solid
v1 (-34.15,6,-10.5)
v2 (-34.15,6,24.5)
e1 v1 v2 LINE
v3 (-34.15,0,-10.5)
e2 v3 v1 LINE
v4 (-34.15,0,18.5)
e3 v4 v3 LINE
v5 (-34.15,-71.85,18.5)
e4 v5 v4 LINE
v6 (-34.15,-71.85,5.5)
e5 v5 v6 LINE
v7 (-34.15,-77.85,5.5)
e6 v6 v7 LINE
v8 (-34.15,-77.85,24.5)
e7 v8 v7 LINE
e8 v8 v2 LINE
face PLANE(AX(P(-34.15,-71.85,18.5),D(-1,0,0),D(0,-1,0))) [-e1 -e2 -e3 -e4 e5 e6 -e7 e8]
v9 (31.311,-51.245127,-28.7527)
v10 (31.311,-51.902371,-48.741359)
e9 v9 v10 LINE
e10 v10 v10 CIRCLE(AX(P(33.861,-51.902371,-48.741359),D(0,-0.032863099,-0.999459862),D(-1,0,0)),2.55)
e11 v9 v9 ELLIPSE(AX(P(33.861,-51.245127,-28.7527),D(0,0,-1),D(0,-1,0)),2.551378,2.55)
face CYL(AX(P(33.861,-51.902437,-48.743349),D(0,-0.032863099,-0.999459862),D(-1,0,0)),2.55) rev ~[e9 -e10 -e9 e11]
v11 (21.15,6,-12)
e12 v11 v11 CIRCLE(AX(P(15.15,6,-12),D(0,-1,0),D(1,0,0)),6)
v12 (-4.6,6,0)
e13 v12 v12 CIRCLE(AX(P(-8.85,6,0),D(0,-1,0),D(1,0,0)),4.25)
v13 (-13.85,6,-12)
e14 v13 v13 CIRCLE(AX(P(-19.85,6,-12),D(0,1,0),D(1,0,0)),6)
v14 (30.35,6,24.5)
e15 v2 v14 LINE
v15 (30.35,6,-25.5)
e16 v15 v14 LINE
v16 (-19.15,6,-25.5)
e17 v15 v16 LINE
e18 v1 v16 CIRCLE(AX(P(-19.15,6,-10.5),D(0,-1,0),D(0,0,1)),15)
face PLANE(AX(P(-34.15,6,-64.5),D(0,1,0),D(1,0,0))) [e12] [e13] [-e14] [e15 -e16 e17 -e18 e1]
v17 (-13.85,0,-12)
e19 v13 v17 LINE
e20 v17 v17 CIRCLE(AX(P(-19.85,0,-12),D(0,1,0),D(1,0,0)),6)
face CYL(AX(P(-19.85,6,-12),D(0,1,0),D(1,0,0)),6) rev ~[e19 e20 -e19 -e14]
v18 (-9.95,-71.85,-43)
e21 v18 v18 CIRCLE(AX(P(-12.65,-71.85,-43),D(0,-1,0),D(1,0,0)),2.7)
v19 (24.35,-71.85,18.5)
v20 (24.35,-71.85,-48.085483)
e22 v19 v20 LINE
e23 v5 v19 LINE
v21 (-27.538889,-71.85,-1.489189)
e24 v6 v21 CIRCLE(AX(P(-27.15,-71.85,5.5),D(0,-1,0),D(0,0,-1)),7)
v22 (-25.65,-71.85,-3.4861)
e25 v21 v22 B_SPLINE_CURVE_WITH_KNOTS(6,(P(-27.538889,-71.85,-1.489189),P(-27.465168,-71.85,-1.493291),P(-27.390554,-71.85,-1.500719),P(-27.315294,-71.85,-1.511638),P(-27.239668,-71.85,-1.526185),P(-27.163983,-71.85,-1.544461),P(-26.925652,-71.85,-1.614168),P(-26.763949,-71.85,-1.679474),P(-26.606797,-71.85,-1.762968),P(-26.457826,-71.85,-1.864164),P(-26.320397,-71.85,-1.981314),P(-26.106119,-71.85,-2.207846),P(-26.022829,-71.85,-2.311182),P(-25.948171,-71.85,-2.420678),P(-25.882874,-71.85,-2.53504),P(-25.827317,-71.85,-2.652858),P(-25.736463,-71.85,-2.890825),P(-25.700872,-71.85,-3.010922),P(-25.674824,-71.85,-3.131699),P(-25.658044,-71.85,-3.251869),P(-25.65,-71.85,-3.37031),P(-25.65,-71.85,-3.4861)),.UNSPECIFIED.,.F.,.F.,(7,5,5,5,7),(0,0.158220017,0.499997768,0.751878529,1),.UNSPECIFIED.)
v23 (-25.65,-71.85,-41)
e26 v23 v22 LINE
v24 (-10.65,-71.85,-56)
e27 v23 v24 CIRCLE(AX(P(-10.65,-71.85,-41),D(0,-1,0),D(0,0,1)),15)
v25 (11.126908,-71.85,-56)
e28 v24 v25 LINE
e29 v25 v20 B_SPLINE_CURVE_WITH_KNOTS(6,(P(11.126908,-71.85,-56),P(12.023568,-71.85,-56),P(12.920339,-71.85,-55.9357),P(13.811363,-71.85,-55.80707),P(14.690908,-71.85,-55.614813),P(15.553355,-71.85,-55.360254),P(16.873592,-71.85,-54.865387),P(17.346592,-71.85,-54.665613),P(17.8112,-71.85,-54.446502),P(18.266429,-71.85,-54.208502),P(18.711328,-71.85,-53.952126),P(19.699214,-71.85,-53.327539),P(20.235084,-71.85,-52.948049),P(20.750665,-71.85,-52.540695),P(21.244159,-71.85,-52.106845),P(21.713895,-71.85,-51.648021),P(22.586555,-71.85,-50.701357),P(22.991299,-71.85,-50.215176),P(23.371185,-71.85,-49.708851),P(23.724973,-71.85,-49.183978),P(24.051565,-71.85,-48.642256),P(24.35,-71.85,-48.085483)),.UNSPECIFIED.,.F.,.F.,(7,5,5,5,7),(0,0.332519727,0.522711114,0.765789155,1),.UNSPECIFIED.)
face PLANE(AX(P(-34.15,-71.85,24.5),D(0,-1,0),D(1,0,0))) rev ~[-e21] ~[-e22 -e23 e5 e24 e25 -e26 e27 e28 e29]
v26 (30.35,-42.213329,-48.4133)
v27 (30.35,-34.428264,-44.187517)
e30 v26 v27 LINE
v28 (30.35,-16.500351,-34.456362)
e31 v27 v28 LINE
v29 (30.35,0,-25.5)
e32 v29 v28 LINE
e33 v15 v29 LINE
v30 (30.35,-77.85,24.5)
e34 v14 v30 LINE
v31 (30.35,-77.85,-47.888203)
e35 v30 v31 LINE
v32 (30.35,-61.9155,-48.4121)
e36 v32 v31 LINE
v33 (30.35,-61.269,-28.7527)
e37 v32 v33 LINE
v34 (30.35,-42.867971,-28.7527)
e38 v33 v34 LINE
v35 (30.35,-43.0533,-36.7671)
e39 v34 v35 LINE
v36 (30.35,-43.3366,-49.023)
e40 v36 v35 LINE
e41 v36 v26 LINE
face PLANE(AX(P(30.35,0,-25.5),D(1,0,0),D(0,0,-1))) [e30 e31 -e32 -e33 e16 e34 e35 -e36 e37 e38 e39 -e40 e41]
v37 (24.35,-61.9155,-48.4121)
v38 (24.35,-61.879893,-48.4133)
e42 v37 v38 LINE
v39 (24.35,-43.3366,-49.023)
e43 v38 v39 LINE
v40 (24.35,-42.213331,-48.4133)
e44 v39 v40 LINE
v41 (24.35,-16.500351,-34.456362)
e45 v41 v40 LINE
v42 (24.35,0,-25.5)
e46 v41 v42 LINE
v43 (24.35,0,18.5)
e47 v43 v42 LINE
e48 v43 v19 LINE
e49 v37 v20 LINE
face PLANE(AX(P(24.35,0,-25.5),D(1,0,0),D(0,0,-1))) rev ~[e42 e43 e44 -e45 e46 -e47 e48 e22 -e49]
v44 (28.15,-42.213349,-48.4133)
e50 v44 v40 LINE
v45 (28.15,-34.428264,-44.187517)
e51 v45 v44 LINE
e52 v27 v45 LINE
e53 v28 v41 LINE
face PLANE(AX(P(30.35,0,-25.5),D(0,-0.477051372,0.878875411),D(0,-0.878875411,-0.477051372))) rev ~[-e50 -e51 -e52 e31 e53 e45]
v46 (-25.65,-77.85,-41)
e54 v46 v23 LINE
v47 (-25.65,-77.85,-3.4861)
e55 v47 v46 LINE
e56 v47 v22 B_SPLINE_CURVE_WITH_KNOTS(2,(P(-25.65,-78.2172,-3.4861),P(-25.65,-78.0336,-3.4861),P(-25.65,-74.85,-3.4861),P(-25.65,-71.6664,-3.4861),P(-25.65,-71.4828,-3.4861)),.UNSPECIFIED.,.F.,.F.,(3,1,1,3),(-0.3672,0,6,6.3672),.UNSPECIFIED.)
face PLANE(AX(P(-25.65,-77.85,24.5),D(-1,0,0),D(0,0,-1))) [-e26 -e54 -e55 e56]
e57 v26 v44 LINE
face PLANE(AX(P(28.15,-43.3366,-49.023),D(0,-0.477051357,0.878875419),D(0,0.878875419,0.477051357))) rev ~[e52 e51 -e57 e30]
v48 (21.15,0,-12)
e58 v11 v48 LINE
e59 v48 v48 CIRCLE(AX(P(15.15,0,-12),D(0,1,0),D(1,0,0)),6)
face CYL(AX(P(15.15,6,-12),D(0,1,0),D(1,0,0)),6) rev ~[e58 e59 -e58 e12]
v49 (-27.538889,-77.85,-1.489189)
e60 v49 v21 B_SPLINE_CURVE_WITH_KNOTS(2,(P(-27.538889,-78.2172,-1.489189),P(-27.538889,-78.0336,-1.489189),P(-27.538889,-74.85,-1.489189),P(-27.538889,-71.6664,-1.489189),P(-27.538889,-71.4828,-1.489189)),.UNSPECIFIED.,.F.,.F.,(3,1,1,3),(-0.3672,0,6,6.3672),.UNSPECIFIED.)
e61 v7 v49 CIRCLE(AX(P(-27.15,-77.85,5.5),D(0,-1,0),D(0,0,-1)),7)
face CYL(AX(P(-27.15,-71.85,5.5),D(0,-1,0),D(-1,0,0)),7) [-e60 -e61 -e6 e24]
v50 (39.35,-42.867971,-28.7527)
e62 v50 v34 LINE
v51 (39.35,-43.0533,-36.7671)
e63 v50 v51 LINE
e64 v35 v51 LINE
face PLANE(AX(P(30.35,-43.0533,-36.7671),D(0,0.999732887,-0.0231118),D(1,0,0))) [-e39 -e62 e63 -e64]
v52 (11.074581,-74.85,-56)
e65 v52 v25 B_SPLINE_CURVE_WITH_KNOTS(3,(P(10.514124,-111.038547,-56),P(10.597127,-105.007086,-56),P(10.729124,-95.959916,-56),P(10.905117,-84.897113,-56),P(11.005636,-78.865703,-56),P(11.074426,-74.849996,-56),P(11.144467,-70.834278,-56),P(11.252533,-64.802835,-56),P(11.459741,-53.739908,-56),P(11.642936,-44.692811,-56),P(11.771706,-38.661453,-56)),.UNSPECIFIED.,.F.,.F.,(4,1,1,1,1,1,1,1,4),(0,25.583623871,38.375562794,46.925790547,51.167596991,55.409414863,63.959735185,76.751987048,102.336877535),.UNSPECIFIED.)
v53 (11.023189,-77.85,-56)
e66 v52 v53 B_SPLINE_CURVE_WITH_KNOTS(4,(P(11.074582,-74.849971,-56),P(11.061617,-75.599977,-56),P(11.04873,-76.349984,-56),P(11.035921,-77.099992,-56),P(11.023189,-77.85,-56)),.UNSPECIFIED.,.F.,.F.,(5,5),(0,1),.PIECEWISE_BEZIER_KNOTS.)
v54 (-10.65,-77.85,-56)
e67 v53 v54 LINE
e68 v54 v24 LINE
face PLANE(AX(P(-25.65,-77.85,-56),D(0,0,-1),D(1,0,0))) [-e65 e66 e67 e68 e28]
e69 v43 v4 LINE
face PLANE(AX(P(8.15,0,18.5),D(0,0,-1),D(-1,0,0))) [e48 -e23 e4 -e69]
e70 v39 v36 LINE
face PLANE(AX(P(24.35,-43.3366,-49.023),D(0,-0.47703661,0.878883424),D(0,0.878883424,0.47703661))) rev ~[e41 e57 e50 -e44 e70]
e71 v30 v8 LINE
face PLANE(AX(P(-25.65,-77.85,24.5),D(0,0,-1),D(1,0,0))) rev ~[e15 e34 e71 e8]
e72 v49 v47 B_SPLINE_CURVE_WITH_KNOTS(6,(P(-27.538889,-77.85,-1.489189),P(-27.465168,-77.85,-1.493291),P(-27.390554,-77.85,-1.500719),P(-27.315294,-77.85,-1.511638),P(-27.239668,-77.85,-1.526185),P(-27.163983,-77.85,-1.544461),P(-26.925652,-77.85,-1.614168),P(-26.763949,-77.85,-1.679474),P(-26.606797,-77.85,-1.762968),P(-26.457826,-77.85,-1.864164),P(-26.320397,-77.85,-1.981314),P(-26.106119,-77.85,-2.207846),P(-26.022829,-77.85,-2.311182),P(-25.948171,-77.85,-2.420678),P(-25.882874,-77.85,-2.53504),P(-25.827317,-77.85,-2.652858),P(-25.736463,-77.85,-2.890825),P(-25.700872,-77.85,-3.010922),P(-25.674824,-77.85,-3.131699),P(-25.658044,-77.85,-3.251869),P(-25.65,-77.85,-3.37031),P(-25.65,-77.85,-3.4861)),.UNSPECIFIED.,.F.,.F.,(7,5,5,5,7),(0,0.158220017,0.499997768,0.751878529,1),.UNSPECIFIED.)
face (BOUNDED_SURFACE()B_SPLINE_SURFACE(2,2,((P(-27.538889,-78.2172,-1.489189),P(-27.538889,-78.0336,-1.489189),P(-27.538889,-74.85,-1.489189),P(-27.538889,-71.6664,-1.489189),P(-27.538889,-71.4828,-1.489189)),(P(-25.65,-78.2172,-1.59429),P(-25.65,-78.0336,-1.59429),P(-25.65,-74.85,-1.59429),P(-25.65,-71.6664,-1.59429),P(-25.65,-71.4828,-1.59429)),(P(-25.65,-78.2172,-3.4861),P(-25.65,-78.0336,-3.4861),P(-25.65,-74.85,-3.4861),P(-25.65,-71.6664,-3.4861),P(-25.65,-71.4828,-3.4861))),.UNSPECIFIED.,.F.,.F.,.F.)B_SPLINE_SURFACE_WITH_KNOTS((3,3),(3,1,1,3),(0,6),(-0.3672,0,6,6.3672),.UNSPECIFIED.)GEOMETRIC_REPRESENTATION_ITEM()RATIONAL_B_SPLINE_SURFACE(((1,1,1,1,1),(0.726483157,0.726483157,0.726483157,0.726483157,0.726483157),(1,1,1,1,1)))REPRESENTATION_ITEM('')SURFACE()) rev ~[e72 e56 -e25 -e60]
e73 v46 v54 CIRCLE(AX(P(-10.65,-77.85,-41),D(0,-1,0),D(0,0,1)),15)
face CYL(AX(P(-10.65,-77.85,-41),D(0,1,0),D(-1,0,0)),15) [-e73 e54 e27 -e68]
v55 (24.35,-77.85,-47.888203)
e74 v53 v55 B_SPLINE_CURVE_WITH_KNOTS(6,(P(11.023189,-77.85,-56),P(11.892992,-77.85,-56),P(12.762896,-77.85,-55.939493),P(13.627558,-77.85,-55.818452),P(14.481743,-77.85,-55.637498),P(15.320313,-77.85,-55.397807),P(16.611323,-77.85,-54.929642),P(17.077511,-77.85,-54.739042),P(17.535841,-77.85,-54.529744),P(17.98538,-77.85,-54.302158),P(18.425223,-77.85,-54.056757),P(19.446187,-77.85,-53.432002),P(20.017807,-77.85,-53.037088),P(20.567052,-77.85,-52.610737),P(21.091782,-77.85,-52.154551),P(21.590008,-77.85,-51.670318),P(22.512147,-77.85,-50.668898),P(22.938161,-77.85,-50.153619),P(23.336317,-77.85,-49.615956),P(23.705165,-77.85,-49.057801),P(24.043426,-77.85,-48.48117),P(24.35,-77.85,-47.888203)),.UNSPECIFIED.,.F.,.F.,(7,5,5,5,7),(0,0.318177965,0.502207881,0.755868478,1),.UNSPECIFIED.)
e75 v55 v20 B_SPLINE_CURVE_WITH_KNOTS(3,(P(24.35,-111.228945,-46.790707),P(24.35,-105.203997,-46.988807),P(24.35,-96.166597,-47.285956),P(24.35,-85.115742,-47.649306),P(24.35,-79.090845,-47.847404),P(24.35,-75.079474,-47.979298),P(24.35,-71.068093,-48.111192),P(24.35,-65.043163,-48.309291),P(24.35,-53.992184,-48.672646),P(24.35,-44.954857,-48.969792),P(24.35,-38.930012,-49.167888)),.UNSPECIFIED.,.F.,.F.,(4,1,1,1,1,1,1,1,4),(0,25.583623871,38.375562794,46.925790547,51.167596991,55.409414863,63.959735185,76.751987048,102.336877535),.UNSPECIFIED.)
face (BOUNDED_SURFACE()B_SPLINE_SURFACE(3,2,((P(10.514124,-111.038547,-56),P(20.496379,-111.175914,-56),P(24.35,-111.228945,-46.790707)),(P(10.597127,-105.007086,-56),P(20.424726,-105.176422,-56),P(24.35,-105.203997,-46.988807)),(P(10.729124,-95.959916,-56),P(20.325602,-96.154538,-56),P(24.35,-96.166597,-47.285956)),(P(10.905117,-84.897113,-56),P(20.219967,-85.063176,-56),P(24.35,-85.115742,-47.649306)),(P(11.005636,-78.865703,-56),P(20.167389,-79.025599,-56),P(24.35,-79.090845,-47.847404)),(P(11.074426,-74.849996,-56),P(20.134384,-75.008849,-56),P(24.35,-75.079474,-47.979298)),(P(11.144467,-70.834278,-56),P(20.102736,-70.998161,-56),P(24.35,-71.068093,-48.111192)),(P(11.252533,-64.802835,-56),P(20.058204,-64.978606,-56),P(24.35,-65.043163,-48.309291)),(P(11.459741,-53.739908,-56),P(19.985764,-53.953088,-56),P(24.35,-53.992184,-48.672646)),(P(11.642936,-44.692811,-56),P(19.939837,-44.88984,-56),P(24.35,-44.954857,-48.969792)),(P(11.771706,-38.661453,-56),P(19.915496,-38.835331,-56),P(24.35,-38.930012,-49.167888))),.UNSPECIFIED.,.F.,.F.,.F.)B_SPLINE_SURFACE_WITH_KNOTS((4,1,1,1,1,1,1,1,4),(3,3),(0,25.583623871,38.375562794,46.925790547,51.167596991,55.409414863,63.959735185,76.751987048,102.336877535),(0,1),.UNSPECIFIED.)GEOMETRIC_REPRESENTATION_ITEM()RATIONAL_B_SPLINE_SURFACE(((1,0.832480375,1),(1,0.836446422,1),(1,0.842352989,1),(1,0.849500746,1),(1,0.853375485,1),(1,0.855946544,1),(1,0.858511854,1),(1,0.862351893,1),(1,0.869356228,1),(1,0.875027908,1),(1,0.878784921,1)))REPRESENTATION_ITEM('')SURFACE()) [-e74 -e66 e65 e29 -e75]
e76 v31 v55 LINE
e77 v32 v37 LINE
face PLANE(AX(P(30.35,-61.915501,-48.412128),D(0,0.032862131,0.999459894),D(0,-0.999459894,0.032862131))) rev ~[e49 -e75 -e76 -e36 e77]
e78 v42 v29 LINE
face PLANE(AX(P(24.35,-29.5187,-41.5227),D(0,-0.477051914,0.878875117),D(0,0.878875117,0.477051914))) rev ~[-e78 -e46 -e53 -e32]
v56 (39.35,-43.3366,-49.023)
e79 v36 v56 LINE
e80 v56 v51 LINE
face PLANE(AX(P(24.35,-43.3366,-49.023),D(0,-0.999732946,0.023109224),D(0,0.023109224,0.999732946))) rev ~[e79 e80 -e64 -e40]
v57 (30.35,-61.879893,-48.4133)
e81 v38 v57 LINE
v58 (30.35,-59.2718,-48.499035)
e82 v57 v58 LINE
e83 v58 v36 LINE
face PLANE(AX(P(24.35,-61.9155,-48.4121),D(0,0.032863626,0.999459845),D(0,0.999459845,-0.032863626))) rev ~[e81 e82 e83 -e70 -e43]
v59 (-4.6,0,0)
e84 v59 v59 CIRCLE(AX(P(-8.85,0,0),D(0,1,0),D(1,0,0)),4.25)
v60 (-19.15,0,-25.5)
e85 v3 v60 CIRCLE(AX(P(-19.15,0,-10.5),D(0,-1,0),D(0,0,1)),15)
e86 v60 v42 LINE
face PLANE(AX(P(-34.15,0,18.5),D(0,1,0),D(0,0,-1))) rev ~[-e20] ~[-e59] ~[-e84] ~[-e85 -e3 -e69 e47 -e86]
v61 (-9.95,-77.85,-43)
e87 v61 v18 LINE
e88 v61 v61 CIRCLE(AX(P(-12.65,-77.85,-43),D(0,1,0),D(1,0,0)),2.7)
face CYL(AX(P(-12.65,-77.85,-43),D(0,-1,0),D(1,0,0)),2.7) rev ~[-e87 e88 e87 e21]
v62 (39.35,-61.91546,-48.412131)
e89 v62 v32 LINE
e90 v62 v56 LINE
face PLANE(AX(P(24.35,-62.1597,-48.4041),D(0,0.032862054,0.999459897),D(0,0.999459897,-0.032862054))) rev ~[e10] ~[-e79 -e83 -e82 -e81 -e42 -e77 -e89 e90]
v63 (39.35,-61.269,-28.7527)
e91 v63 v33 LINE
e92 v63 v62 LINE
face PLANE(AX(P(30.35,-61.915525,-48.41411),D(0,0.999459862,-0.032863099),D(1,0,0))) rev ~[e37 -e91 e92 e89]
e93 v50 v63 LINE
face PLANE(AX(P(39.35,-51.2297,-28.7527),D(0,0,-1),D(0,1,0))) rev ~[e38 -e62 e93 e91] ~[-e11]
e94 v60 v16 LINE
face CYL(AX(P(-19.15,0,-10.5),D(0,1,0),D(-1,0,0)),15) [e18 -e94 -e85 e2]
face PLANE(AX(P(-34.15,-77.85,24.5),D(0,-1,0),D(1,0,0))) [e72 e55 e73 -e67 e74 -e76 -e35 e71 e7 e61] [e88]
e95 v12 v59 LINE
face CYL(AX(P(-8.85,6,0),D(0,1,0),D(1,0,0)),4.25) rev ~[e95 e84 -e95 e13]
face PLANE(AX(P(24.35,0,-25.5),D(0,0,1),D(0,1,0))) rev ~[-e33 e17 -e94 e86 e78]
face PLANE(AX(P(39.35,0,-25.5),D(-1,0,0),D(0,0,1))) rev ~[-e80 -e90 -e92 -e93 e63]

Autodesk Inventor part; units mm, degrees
ref_plane "YZ Plane" through (0, 0, 0) normal (1, 0, 0) x (0, 1, 0)
ref_plane "XZ Plane" through (0, 0, 0) normal (0, 1, 0) x (-1, 0, 0)
ref_plane "XY Plane" through (0, 0, 0) normal (0, 0, 1) x (1, 0, 0)
sketch "Sketch1" plane through (0, 0, 0) normal (0, 1, 0) x (-1, 0, 0)
  line L0 (0, -25.5) -> (-34.15, -25.5)
  line L1 (-34.15, -25.5) -> (-34.15, 0)
  line L2 (-34.15, 0) -> (-34.15, 25.5)
  line L3 (-34.15, 25.5) -> (0, 25.5)
  line L4 (0, 25.5) -> (34.15, 25.5)
  line L5 (34.15, 25.5) -> (34.15, 0)
  line L6 (34.15, 0) -> (34.15, -25.5)
  line L7 (34.15, -25.5) -> (0, -25.5)
  point P0 (0, 0)
extrude "Extrusion1" add sketch "Sketch1" along normal blind 7
sketch "Sketch3" plane through (-34.15, 0, 25.5) normal (0, 0, 1) x (1, 0, 0)
  line L0 (0, 0) -> (0, -78.85)
  point P0 (34.15, 0)
  dimension "d7" = 78.85
sketch "Sketch4" plane through (-34.15, 0, -25.5) normal (-1, 0, 0) x (0, 0, 1)
  line L0 (51, 0) -> (51, -78.85)
  line L1 (51, -78.85) -> (-39, -78.85)
  line L2 (-39, -78.85) -> (-39, -71.85)
  line L3 (0, 0) -> (-39, -71.85)
  line L4 (0, 0) -> (51, 0)
  point P0 (25.5, 0)
  dimension "d10" = 90
  dimension "d11" = 7
extrude "Extrusion2" add sketch "Sketch4" against normal blind 7
sketch "Sketch7" plane through (-27.15, 0, -25.5) normal (1, 0, 0) x (0, 0, -1)
  line L0 (-51, -78.85) -> (39, -78.85) projected
  line L1 (-51, -78.85) -> (39, -78.85)
  line L2 (39, -78.85) -> (39, -71.85) projected
  line L3 (39, -78.85) -> (39, -71.85)
  line L4 (39, -71.85) -> (-51, -71.85)
  line L5 (-51, 0) -> (-51, -78.85) projected
  line L6 (-51, -78.85) -> (-51, -71.85)
  point P0 (-25.5, 0)
sketch "Sketch8" plane through (0, 0, 0) normal (0, -1, 0) x (1, 0, 0)
  circle A0 centre (8.15, 0) radius 5 projected
  line L0 (8.15, 18.5) -> (34.15, 18.5)
  line L1 (34.15, 25.5) -> (34.15, -25.5) projected
  line L2 (8.15, 25.5) -> (34.15, 25.5)
  line L3 (8.15, 25.5) -> (-27.15, 25.5)
  line L4 (-27.15, 25.5) -> (-27.15, -25.5) projected
  line L5 (8.15, 18.5) -> (-27.15, 18.5)
  line L6 (34.15, 25.5) -> (34.15, 18.5)
  line L7 (-27.15, 25.5) -> (-27.15, 18.5)
  point P0 (0, 0)
extrude "Extrusion6" add sketch "Sketch7" along normal blind 58.5
extrude "Extrusion7" add sketch "Sketch8" along normal blind 78.75 contours L5 L4 L3 L2 L1 L0
sketch "Sketch9" plane through (31.35, 0, -25.5) normal (1, 0, 0) x (0, 0, -1)
  line L0 (-51, -78.75) -> (-51, 7) projected
  line L1 (-44, 0) -> (-44, -71.85) projected
  line L2 (-51, -78.75) -> (-44, -78.75)
  line L3 (-44, -78.75) -> (-44, -71.85)
  line L4 (-44, -71.85) -> (-51, -71.85)
  line L5 (-51, -71.85) -> (-51, -78.75)
  point P0 (-25.5, 0)
extrude "Extrusion8" cut sketch "Sketch9" along normal blind 10
sketch "Sketch10" plane through (0, 7, 0) normal (0, 1, 0) x (1, 0, 0)
  point P0 (0, 0)
sketch "Boceto11" plane through (-34.15, -78.85, -64.5) normal (0, -1, 0) x (1, 0, 0)
  line L0 (0, 0) -> (65.5, 0) projected
  line L1 (65.5, 89.9985) -> (65.5, 0)
  line L2 (65.5, 0) -> (71.065, 0)
  line L3 (71.065, 0) -> (71.065, 89.9985)
  line L4 (71.065, 89.9985) -> (65.5, 89.9985)
  line L5 (65.5, 89.9985) -> (65.5, 95.8996)
  line L6 (65.5, 95.8996) -> (71.065, 89.9985)
  point P0 (34.15, 64.5)
extrude "Extrusión9" cut sketch "Boceto11" against normal blind 100
sketch "Boceto12" plane through (31.35, 0, -25.5) normal (1, 0, 0) x (0, 0, -1)
  line L0 (-44, 0) -> (-44, -71.85) projected
  line L1 (-44, 0) -> (-44, -71.85)
  line L2 (39, -71.85) -> (39, -78.85) projected
  line L3 (-44, -71.85) -> (39, -71.85)
  line L4 (-44, 0) -> (0, 0) projected
  line L5 (39, -71.85) -> (0, 0)
  line L6 (0, 0) -> (-44, 0)
  point P0 (-25.5, 0)
extrude "Extrusión10" add sketch "Boceto12" against normal blind 7
sketch "Boceto13" plane through (-34.15, 7, -25.5) normal (-1, 0, 0) x (0, 0, 1)
  line L0 (0, -7) -> (0, 0) projected
  line L1 (44, -7) -> (0, -7) projected
  line L2 (0, -7) -> (44, -7)
  line L3 (44, -78.85) -> (-39, -78.85) projected
  line L4 (44, -7) -> (44, -78.85)
  line L5 (44, -78.85) -> (-39, -78.85)
  line L6 (-39, -78.85) -> (0, -7)
  point P0 (25.5, -7)
extrude "Extrusión11" cut sketch "Boceto13" against normal blind 7
sketch "Boceto15" plane through (-34.15, 0, -25.5) normal (0, 0, -1) x (-1, 0, 0)
  point P0 (-34.15, 0)
sketch "Boceto19" plane through (-34.15, -78.85, -64.5) normal (0, -1, 0) x (1, 0, 0)
  line L0 (65.5, 90) -> (65.5, 0) projected
  line L1 (65.5, 0) -> (65.5, 40.9323)
  line L2 (81.7334, 40.9323) -> (65.5, 40.9323)
  line L3 (81.7334, 40.9323) -> (81.7334, 0)
  line L4 (81.7334, 0) -> (65.5, 0)
  point P0 (34.15, 64.5)
extrude "Extrusión17" cut sketch "Boceto19" against normal blind 100
sketch "Boceto20" plane through (24.35, 0, -25.5) normal (-1, 0, 0) x (0, 0, 1)
  line L0 (-29.1839, -53.7657) -> (-27.9516, -53.3206) projected
  line L1 (0, 0) -> (-39, -71.85) projected
  line L2 (-29.1839, -53.7657) -> (-27.8697, -51.3447)
  line L3 (-27.8697, -51.3447) -> (-27.9516, -53.3206) projected
  line L4 (-27.8697, -51.3447) -> (-27.9516, -53.3206)
  line L5 (-27.9516, -53.3206) -> (-29.1839, -53.7657)
  point P0 (25.5, 0)
extrude "Extrusión18" add sketch "Boceto20" against normal blind 7
sketch "Boceto21" plane through (24.35, 0, -25.5) normal (-1, 0, 0) x (0, 0, 1)
  point P0 (25.5, 0)
sketch "Boceto22" plane through (24.35, 0, -25.5) normal (-1, 0, 0) x (0, 0, 1)
  point P0 (25.5, 0)
sketch "Boceto24" plane through (31.35, 0, -25.5) normal (1, 0, 0) x (0, 0, -1)
  point P0 (-25.5, 0)
sketch "Boceto26" plane through (24.35, 0, -25.5) normal (-1, 0, 0) x (0, 0, 1)
  point P0 (25.5, 0)
sketch "Boceto27" plane through (31.35, 0, -25.5) normal (1, 0, 0) x (0, 0, -1)
  line L0 (-51, 7) -> (0, 7) projected
  line L1 (0, 7) -> (16.0227, 7)
  line L2 (16.0227, 7) -> (16.0227, -29.5187)
  line L3 (0, 0) -> (39, -71.85) projected
  line L4 (16.0227, -29.5187) -> (0, 0)
  line L5 (0, 0) -> (0, 7)
  point P0 (-25.5, 0)
extrude "Extrusión22" add sketch "Boceto27" against normal blind 7
sketch "Boceto28" plane through (24.35, 0, -25.5) normal (-1, 0, 0) x (0, 0, 1)
  line L0 (-16.0227, -29.5187) -> (-39, -71.85) projected
  line L1 (-16.0227, -29.5187) -> (0, 0)
  line L2 (0, 7) -> (-16.0227, 7) projected
  line L3 (0, 0) -> (0, 7)
  line L4 (0, 7) -> (-16.0227, 7)
  line L5 (-16.0227, 7) -> (-16.0227, -29.5187) projected
  line L6 (-16.0227, 7) -> (-16.0227, -29.5187)
  point P0 (25.5, 0)
extrude "Extrusión23" cut sketch "Boceto28" against normal blind 7
sketch "Boceto29" plane through (31.35, 0, -25.5) normal (1, 0, 0) x (0, 0, -1)
  point P0 (-25.5, 0)
sketch "Boceto31" plane through (-34.15, -78.85, -64.5) normal (0, 0, -1) x (-1, 0, 0)
  line L0 (0, 7) -> (0, 0) projected
  line L1 (0, 0) -> (0, 1)
  line L2 (0, 1) -> (-65.5, 1)
  line L3 (-65.5, 0) -> (-65.5, 85.85) projected
  line L4 (-65.5, 1) -> (-64.5, 1)
  line L5 (-64.5, 1) -> (-64.5, 85.85)
  line L6 (0, 85.85) -> (-65.5, 85.85) projected
  line L7 (-64.5, 85.85) -> (0, 85.85)
  line L8 (0, 85.85) -> (0, 84.85)
  line L9 (0, 0) -> (0, 85.85) projected
  line L10 (0, 84.85) -> (-64.5, 84.85)
  line L11 (-64.5, 85.85) -> (-65.5, 85.85)
  line L12 (0, 0) -> (-65.5, 0) projected
  line L13 (-65.5, 85.85) -> (-65.5, 0)
  line L14 (-65.5, 0) -> (0, 0)
  point P0 (-34.15, 78.85)
  dimension "d84" = 1
  dimension "d85" = 1
  dimension "d86" = 1
extrude "Extrusión26" cut sketch "Boceto31" against normal blind 1000 contours L0 L12 L3 L2 | L10 L5 L6 L8 | L2 L3 L6 L5
sketch "Boceto32" plane through (-34.15, -71.85, 18.5) normal (-1, 0, 0) x (0, 0, 1)
  line L0 (-83, -6) -> (7, -6) projected
  line L1 (7, -6) -> (6, -6)
  line L2 (6, -6) -> (6, 77.85)
  line L3 (7, 77.85) -> (-44, 77.85) projected
  line L4 (7, -6) -> (7, 77.85) projected
  line L5 (6, 77.85) -> (7, 77.85)
  line L6 (7, 77.85) -> (7, -6)
  point P0 (-18.5, 71.85)
  dimension "d89" = 1
extrude "Extrusión27" cut sketch "Boceto32" against normal blind 100
sketch "Boceto33" plane through (-34.15, 6, -25.5) normal (0, 1, 0) x (1, 0, 0)
  line L0 (0, 0) -> (0, -44) projected
  line L1 (0, 0) -> (0, -25.5)
  line L2 (0, -25.5) -> (25.3, -25.5)
  circle A0 centre (25.3, -25.5) radius 4.25
  point P0 (34.15, -25.5)
  dimension "d92" = 25.5
  dimension "d93" = 25.3
  dimension "d94" = 8.5
extrude "Extrusión28" cut sketch "Boceto33" against normal blind 10
sketch "Boceto34" plane through (30.35, -77.85, -64.5) normal (1, 0, 0) x (0, 0, -1)
  point P0 (-64.5, 77.85)
sketch "Boceto35" plane through (30.35, -77.85, -64.5) normal (1, 0, 0) x (0, 0, -1)
  circle A0 centre (-24.4828, 41.285) radius 2.6
  point P0 (-64.5, 77.85)
  dimension "d101" = 5.2
extrude "Extrusión29" cut sketch "Boceto35" against normal blind 10
sketch "Boceto36" plane through (30.35, -77.85, -64.5) normal (1, 0, 0) x (0, 0, -1)
  point P0 (-64.5, 77.85)
sketch "Boceto37" plane through (30.35, -77.85, -64.5) normal (1, 0, 0) x (0, 0, -1)
  line L0 (-39, 77.85) -> (0, 6) projected
  line L1 (-12.3437, 28.741) -> (-12.3437, 48.1268)
  line L2 (-12.3437, 48.1268) -> (-28.4038, 58.3285)
  line L3 (-12.3437, 28.741) -> (-28.4038, 58.3285)
  point P0 (-64.5, 77.85)
extrude "Extrusión30" add sketch "Boceto37" against normal blind 6
fillet "Empalme3" radius 10 3 edges at (27.35, -29.7232, -52.1563) (27.35, -49.109, -52.1563) (27.35, -19.5215, -36.0962)
sketch "Boceto38" plane through (30.35, -77.85, -64.5) normal (1, 0, 0) x (0, 0, -1)
  point P0 (-64.5, 77.85)
sketch "Boceto39" plane through (30.35, -77.85, -64.5) normal (1, 0, 0) x (0, 0, -1)
  line L0 (-6.8274, 18.5782) -> (-18.8698, 18.5782)
  line L1 (-18.8698, 18.5782) -> (-18.2969, 35.7502)
  line L2 (-18.2969, 35.7502) -> (-20.685, 39.2299)
  line L3 (-20.685, 39.2299) -> (-19.4909, 52.6668)
  line L4 (-26.2143, 56.9377) -> (-16.9818, 51.073) projected
  line L5 (-6.8274, 18.5782) -> (-5.5662, 48.0514)
  line L6 (-5.5662, 48.0514) -> (-19.4909, 52.6668)
  point P0 (-64.5, 77.85)
extrude "Extrusión31" cut sketch "Boceto39" against normal blind 2.2
fillet "Empalme4" radius 10 1 edges at (29.25, -25.1832, -45.0091)
sketch "Boceto40" plane through (24.35, 0, -25.5) normal (-1, 0, 0) x (0, 0, 1)
  line L0 (-26.6563, -35.218) -> (-26.6563, -46.57) projected
  line L1 (-26.6563, -35.218) -> (-24.0221, -30.4862) construction
  arc A0 (-12.7857, -20.9123) -> (-9.3588, -17.2419) centre (-18.1476, -12.4713) ccw projected
  line L2 (-24.0221, -30.4862) -> (-10.7107, -19.1566) construction
  spline S0 degree 2 poles (-26.6563, -35.218) (-24.0221, -30.4862) (-10.7107, -19.1566) knots 1 1 1 2 2 2
  line L3 (-26.6563, -35.218) -> (-10.7107, -35.218)
  line L4 (-10.7107, -35.218) -> (-10.7107, -19.1566)
  line L5 (-10.7107, -19.1566) -> (-26.6563, -19.1566)
  line L6 (-26.6563, -19.1566) -> (-26.6563, -35.218)
  point P0 (25.5, 0)
  point P1 (-10.7107, -19.1566)
extrude "Extrusión32" cut sketch "Boceto40" against normal blind 6 contours S0 L6 L5
fillet "Empalme5" radius 10 1 edges at (26.25, -35.218, -52.1563)
sketch "Boceto41" plane through (-34.15, -71.85, 18.5) normal (0, 1, 0) x (1, 0, 0)
  circle A0 centre (11.5, 71.5) radius 5 projected
  circle A1 centre (11.5, 71.5) radius 6
  line L0 (11.5, 71.5) -> (-12.5, 71.5)
  line L1 (-12.5, 71.5) -> (-12.5, 95.5)
  line L2 (-12.5, 95.5) -> (11.5, 95.5)
  line L3 (11.5, 95.5) -> (11.5, 71.5)
  line L4 (64.5, 76.1726) -> (64.5, 83) projected
  line L5 (64.5, 83) -> (64.5, 95.5)
  line L6 (64.5, 95.5) -> (11.5, 95.5)
  line L7 (0, 83) -> (0, -6) projected
  line L8 (0, -6) -> (-12.5, -6)
  line L9 (-12.5, -6) -> (-12.5, 71.5)
  line L10 (64.5, 83) -> (11.5, 83)
  line L11 (0, 83) -> (58.5, 83) projected
  point P0 (34.15, 18.5)
  dimension "d113" = 12
  dimension "d114" = 24
  dimension "d115" = 24
extrude "Extrusión33" add sketch "Boceto41" against normal blind 6 contours L11 L7 L0 L1 L2 L3 | L3 L6 L5 L10 | L7 L8 L9 L0
sketch "Boceto43" plane through (30.35, 6, 24.5) normal (0, 1, 0) x (1, 0, 0)
  circle A0 centre (-39.2, 24.5) radius 4.25 projected
  circle A1 centre (-15.2, 36.5) radius 6
  circle A2 centre (-50.2, 36.5) radius 6
  line L0 (-15.2, 36.5) -> (-50.2, 36.5)
  point P0 (-30.35, 24.5)
  dimension "d126" = 12
  dimension "d127" = 12
  dimension "d240" = 35
extrude "Extrusión35" cut sketch "Boceto43" against normal blind 6 contours A1 | A2
sketch "Boceto44" plane through (24.35, 0, -25.5) normal (-1, 0, 0) x (0, 0, 1)
  line L0 (0, 0) -> (-9.3588, -17.2419) projected
  line L1 (-9.3588, -17.2419) -> (-30.5215, -33.5874)
  line L2 (-30.5215, -33.5874) -> (-30.5215, -56.2301)
  line L3 (-27.8675, -51.3405) -> (-39, -71.85) projected
  arc A0 (-12.666, -20.8351) -> (-9.3588, -17.2419) centre (-18.1476, -12.4713) ccw projected
  line L4 (-30.5215, -56.2301) -> (-9.3588, -17.2419)
  point P0 (25.5, 0)
extrude "Extrusión36" add sketch "Boceto44" against normal blind 6
sketch "Boceto45" plane through (30.35, 0, -25.5) normal (1, 0, 0) x (0, 0, -1)
  line L0 (18.315, -38.6201) -> (18.6875, -34.4282) projected
  line L1 (18.6875, -34.4282) -> (19.9402, -25.4146)
  line L2 (9.3588, -17.2419) -> (30.5215, -33.5874) projected
  line L3 (30.5215, -56.2301) -> (30.5215, -33.5874) projected
  line L4 (19.9402, -25.4146) -> (30.5215, -33.5874)
  line L5 (30.5215, -33.5874) -> (32.1519, -59.2336)
  line L6 (30.5215, -56.2301) -> (39, -71.85) projected
  line L7 (32.1726, -59.2718) -> (20.1302, -59.2718) projected
  line L8 (32.1726, -59.2718) -> (18.315, -38.6201)
  point P0 (-25.5, 0)
extrude "Extrusión37" cut sketch "Boceto45" against normal blind 2.2 contours L0 L1 L2 L3 L6 L8
fillet "Empalme7" radius 4 3 edges at (26.25, -33.5874, -56.0215) (27.35, -17.2419, -34.8588) (26.25, -56.2301, -56.0215)
sketch "Boceto46" plane through (-34.15, -71.85, 18.5) normal (0, 1, 0) x (1, 0, 0)
  line L0 (-12.5, -6) -> (0, -6) projected
  line L1 (0, -6) -> (0, 95.5)
  line L2 (-12.5, 95.5) -> (64.5, 95.5) projected
  line L3 (0, 95.5) -> (-12.5, 95.5)
  line L4 (-12.5, 95.5) -> (-12.5, -6)
  line L5 (-12.5, -6) -> (0, -6)
  point P0 (34.15, 18.5)
extrude "Extrusión38" cut sketch "Boceto46" against normal blind 10
sketch "Sketch48" plane through (-34.15, -71.85, 18.5) normal (0, 1, 0) x (1, 0, 0)
  circle A0 centre (26.5, 69) radius 6 projected
  line L0 (29.7126, 74.0675) -> (26.5, 69)
  circle A1 centre (26.5, 69) radius 18
  line L1 (8.5, 69) -> (8.5, 0)
  line L2 (0, 0) -> (58.5, 0) projected
  line L3 (0, 0) -> (8.5, 0)
  line L4 (26.5, 87) -> (64.5, 87)
  line L5 (64.5, 83) -> (64.5, 95.5) projected
  line L6 (0, 0) -> (0, -6) projected
  line L7 (64.5, 95.5) -> (0, 95.5)
  line L8 (0, 95.5) -> (0, 0)
  point P0 (34.15, 18.5)
  dimension "d142" = 36
extrude "Extrusion40" cut sketch "Sketch48" against normal blind 10 contours A1 L1 L2 L8 L7 L5 L4
sketch "Sketch49" plane through (24.35, 0, 18.5) normal (0, 0, -1) x (-1, 0, 0)
  line L0 (58.5, -77.85) -> (50, -77.85) projected
  line L1 (58.5, -77.85) -> (50, -77.85)
  line L2 (50, -71.85) -> (0, -71.85) projected
  line L3 (50, -77.85) -> (50, -71.85)
  line L4 (50, -71.85) -> (58.5, -71.85)
  line L5 (58.5, -71.85) -> (58.5, -77.85)
  point P0 (24.35, 0)
extrude "Extrusion41" add sketch "Sketch49" along normal blind 20
fillet "Fillet8" radius 7 1 edges at (-34.15, -74.85, -1.5)
fillet "Fillet9" radius 2 1 edges at (-25.65, -74.85, -1.5)
sketch "Sketch50" plane through (28.15, -77.85, -64.5) normal (1, 0, 0) x (0, 0, -1)
  point P0 (-64.5, 77.85)
sketch "Sketch51" plane through (-34.15, -77.85, 24.5) normal (0, -1, 0) x (1, 0, 0)
  line L0 (64.5, -50) -> (64.5, 0) projected
  line L1 (64.5, 0) -> (-39.5, 0)
  line L2 (-39.5, 0) -> (-39.5, -120)
  line L3 (-39.5, -120) -> (64.5, -120)
  line L4 (64.5, -120) -> (64.5, 0)
  point P0 (34.15, -24.5)
  dimension "d149" = 104
  dimension "d150" = 120
sketch "Sketch52" plane through (30.35, 0, -25.5) normal (1, 0, 0) x (0, 0, -1)
  line L0 (0, 0) -> (-44, 0) projected
  line L1 (32.1726, -59.2718) -> (39, -71.85) projected
  line L2 (0, 0) -> (39, -71.85)
  line L3 (22.9041, -62.1597) -> (23.523, -43.3366)
  line L4 (22.9041, -62.1597) -> (39, -71.85)
  line L5 (39, -71.85) -> (32.1726, -12.8018)
  line L6 (0, 0) -> (0, 6) projected
  line L7 (32.1726, -12.8018) -> (0, 0)
  point P0 (-25.5, 0)
extrude "Extrusion42" cut sketch "Sketch52" against normal blind 10
sketch "Sketch53" plane through (28.15, -77.85, -64.5) normal (1, 0, 0) x (0, 0, -1)
  line L0 (-16.0959, 15.6903) -> (0, 6) projected
  line L1 (-16.001, 18.5782) -> (-15.477, 34.5134) projected
  line L2 (-16.0959, 15.6903) -> (-15.477, 34.5134)
  line L3 (-15.477, 34.5134) -> (-20.7531, 44.2336)
  line L4 (-39, 77.85) -> (-15.477, 34.5134) projected
  line L5 (-20.7531, 44.2336) -> (-21.8828, 18.4708)
  line L6 (-21.8828, 18.4708) -> (-16.0045, 18.4708)
  point P0 (-64.5, 77.85)
extrude "Extrusion43" add sketch "Sketch53" along normal blind 2.2
sketch "Sketch54" plane through (30.35, 0, -25.5) normal (1, 0, 0) x (0, 0, -1)
  circle A0 centre (14.5172, -36.565) radius 2.6 projected
  circle A1 centre (14.5172, -36.565) radius 2.6
  point P0 (-25.5, 0)
extrude "Extrusion44" add sketch "Sketch54" against normal blind 6
sketch "Sketch55" plane through (30.35, 0, -25.5) normal (1, 0, 0) x (0, 0, -1)
  line L0 (39, -71.85) -> (22.9041, -62.1597) projected
  line L1 (22.9041, -62.1597) -> (13.9423, -61.864)
  line L2 (22.9041, -62.1597) -> (23.523, -43.3366) projected
  line L3 (19.528, -36.1291) -> (23.523, -43.3366)
  line L4 (22.9041, -62.1597) -> (23.523, -43.3366)
  line L5 (5.6191, -42.216) -> (13.9423, -61.864)
  line L6 (5.6191, -42.216) -> (19.528, -36.1291)
  point P0 (-25.5, 0)
sketch "Sketch56" plane through (24.35, 0, -25.5) normal (-1, 0, 0) x (0, 0, 1)
  line L0 (-22.9041, -62.1597) -> (-23.523, -43.3366) projected
  line L1 (-23.523, -43.3366) -> (-22.9041, -62.1597)
  line L2 (-22.9041, -62.1597) -> (-10.8346, -61.7628)
  line L3 (-10.8346, -61.7628) -> (-11.7615, -21.6683)
  line L4 (0, 0) -> (-23.523, -43.3366) projected
  line L5 (-23.523, -43.3366) -> (-11.2671, -43.0533)
  line L6 (-23.523, -43.3366) -> (-22.9041, -62.1597)
  line L7 (-22.9041, -62.1597) -> (-10.8346, -61.7628)
  line L8 (-10.8346, -61.7628) -> (-11.2671, -43.0533)
  line L9 (-11.2671, -43.0533) -> (-23.523, -43.3366)
  point P0 (25.5, 0)
extrude "Extrusion45" add sketch "Sketch56" against normal blind 15 contours L0 L5 L3 L2
sketch "Sketch57" plane through (39.35, -43.3366, -49.023) normal (0, -0.0328631, -0.9994599) x (-1, 0, 0)
  line L0 (0.989, -8.5704) -> (9.989, -8.5704)
  line L1 (9, 46.8938) -> (9, -36.911) projected
  circle A0 centre (5.489, -8.5704) radius 2.55
  line L2 (5.489, -8.5704) -> (0.989, -8.5704)
  line L3 (5.489, -8.5704) -> (-0.011, -8.5704)
  point P0 (39.35, 41.7021)
  dimension "d218" = 5.5
  dimension "d219" = 5.1
extrude "Extrusion46" cut sketch "Sketch57" against normal blind 20
sketch "Sketch58" plane through (39.35, 0, -25.5) normal (1, 0, 0) x (0, 0, -1)
  point P0 (-25.5, 0)
sketch "Sketch59" plane through (30.35, -43.0533, -36.7671) normal (0, 0.9997329, -0.0231118) x (1, 0, 0)
  line L0 (9, 0) -> (9, 12.0754) projected
  line L1 (0, 32.5286) -> (0, -60.4465) projected
  line L2 (9, 0) -> (0, 0)
  line L3 (0, 0) -> (0, -12.412)
  line L4 (0, -12.412) -> (9, -12.412)
  line L5 (9, -12.412) -> (9, 0)
  line L6 (0, -12.412) -> (0, -36.6315)
  line L7 (0, -36.6315) -> (9, -12.412)
  point P0 (-30.35, -37.7523)
extrude "Extrusion47" add sketch "Sketch59" against normal blind 18.7159
sketch "Sketch60" plane through (30.35, 0, -25.5) normal (1, 0, 0) x (0, 0, -1)
  line L0 (22.9041, -62.1597) -> (10.8346, -61.7628) projected
  line L1 (22.9041, -62.1597) -> (-35.3443, -60.8131)
  line L2 (10.8346, -61.7642) -> (-25.7871, -60.9175) projected
  line L3 (-35.3443, -60.8131) -> (-11.8971, -71.85)
  line L4 (-44, -71.85) -> (39, -71.85) projected
  line L5 (22.9041, -62.1597) -> (-11.8971, -71.85)
  point P0 (-25.5, 0)
extrude "Extrusion48" cut sketch "Sketch60" along normal blind 18.7159
sketch "Sketch61" plane through (39.35, -43.3366, -49.023) normal (0, -0.0328631, -0.9994599) x (-1, 0, 0)
  point P0 (39.35, 41.7021)
sketch "Sketch62" plane through (39.35, -43.3366, -49.023) normal (0, -0.0328631, -0.9994599) x (-1, 0, 0)
  line L0 (9, -18.8333) -> (9, -18.8346) projected
  line L1 (9, -18.8346) -> (-1.0251, -18.8346)
  line L2 (-1.0251, -18.8346) -> (-1.0251, -24.5564)
  line L3 (-1.0251, -24.5564) -> (9, -24.5564)
  line L4 (9, -24.5564) -> (9, -18.8346)
  point P0 (39.35, 41.7021)
extrude "Extrusion49" cut sketch "Sketch62" against normal blind 100
sketch "Sketch63" plane through (39.35, -43.3366, -49.023) normal (0, -0.0328631, -0.9994599) x (-1, 0, 0)
  line L0 (9, 46.8938) -> (9, -36.911) projected
  line L1 (9, -18.5889) -> (-0.3497, -18.5889)
  line L2 (-0.3497, -18.5889) -> (-0.3497, -22.6635)
  line L3 (-0.3497, -22.6635) -> (9, -22.6635)
  line L4 (9, -22.6635) -> (9, -18.5889)
  point P0 (39.35, 41.7021)
  point P1 (9, -22.6635)
extrude "Extrusion50" cut sketch "Sketch63" against normal blind 100
sketch "Sketch64" plane through (-34.15, 6, -25.5) normal (0, 1, 0) x (1, 0, 0)
  line L0 (58.5, -44) -> (58.5, 39) projected
  line L1 (58.5, 23.5443) -> (58.5, 43.0724)
  line L2 (58.5, 43.0724) -> (64.7623, 43.0724)
  line L3 (64.7623, 43.0724) -> (64.7623, 23.523)
  line L4 (64.5, 23.523) -> (73.5, 23.523) projected
  line L5 (58.5, 23.523) -> (64.5, 23.523) projected
  line L6 (58.5, 23.523) -> (64.7623, 23.523)
  point P0 (34.15, -25.5)
extrude "Extrusion51" cut sketch "Sketch64" against normal blind 100
sketch "Sketch65" plane through (-34.15, 6, -25.5) normal (0, 1, 0) x (1, 0, 0)
  point P0 (34.15, -25.5)
sketch "Sketch66" plane through (-34.15, -77.85, 24.5) normal (0, -1, 0) x (1, 0, 0)
  line L0 (64.5, -73.523) -> (64.5, 0) projected
  line L1 (64.5, -72.9133) -> (58.4721, -72.9133)
  line L2 (58.4721, -72.9133) -> (58.4721, -73.523)
  line L3 (58.4721, -73.523) -> (64.5, -73.523)
  line L4 (64.5, -73.523) -> (64.5, -72.9133)
  point P0 (34.15, -24.5)
extrude "Extrusion52" cut sketch "Sketch66" against normal blind 100
sketch "Sketch67" plane through (24.35, 0, -25.5) normal (-1, 0, 0) x (0, 0, 1)
  line L0 (-22.9121, -61.9155) -> (-23.523, -43.3366) projected
  line L1 (-22.9121, -61.9155) -> (-23.523, -43.3366)
  line L2 (-22.9133, -43.3225) -> (-22.9133, -42.2133) projected
  line L3 (-23.523, -43.3366) -> (-22.9133, -42.2133)
  line L4 (-22.9133, -42.2133) -> (-22.9121, -61.9155)
  point P0 (25.5, 0)
extrude "Extrusion53" add sketch "Sketch67" against normal blind 6
sketch "Sketch68" plane through (24.35, -62.1597, -48.4041) normal (0, 0.8567227, -0.5157773) x (1, 0, 0)
  point P0 (-24.35, -73.5294)
sketch "Sketch69" plane through (30.35, 0, -25.5) normal (1, 0, 0) x (0, 0, -1)
  point P0 (-25.5, 0)
sketch "Sketch70" plane through (30.35, 0, -25.5) normal (1, 0, 0) x (0, 0, -1)
  line L0 (22.9121, -61.9155) -> (23.523, -43.3366) projected
  line L1 (23.523, -43.3366) -> (22.9041, -62.1597) projected
  line L2 (22.9121, -61.9155) -> (22.9041, -62.1597)
  line L3 (22.9041, -62.1597) -> (22.9133, -62.1652)
  line L4 (22.9133, -62.1652) -> (22.9121, -61.9155)
  point P0 (-25.5, 0)
  point P1 (22.9133, -77.85)
extrude "Extrusion54" add sketch "Sketch70" against normal blind 6
sketch "Sketch77" plane through (30.35, -77.85, -48.4133) normal (0, -1, 0) x (1, 0, 0)
  point P0 (-30.35, 48.4133)
sketch "Sketch78" plane through (30.35, -77.85, -48.4133) normal (0, -1, 0) x (1, 0, 0)
  line L0 (-64.5, 72.9133) -> (-43, 72.9133)
  line L1 (-43, 72.9133) -> (-43, 5.4133)
  line L2 (-43, 5.4133) -> (-64.5, 5.4133)
  line L3 (-64.5, 5.4133) -> (-64.5, 72.9133)
  circle A0 centre (-43, 5.4133) radius 2.7
  point P0 (-30.35, 48.4133)
  dimension "d203" = 21.5
  dimension "d204" = 67.5
  dimension "d205" = 5.4
extrude "Extrusion62" cut sketch "Sketch78" against normal blind 10 contours A0 L2 L1 | L1 L2 A0
sketch "Sketch81" plane through (-34.15, -77.85, 24.5) normal (0, -1, 0) x (1, 0, 0)
  circle A0 centre (21.5, -67.5) radius 2.7 projected
  line L0 (21.5, -67.5) -> (21.5, -80.5)
  line L1 (21.5, -80.5) -> (58.5, -80.5)
  line L2 (58.5, -93) -> (58.5, -73.523) projected
  circle A1 centre (21.5, -67.5) radius 2.7
  line L3 (0, 0) -> (64.5, 0) projected
  line L4 (58.5, 0) -> (8.5, 0)
  line L5 (8.5, 0) -> (8.5, -80.5)
  line L6 (8.5, -80.5) -> (58.5, -80.5)
  line L7 (58.5, -80.5) -> (58.5, 0)
  line L8 (58.5, -80.5) -> (8.5, -80.5)
  line L9 (8.5, -80.5) -> (8.5, -99.9184)
  line L10 (8.5, -99.9184) -> (58.5, -99.9184)
  line L11 (58.5, -99.9184) -> (58.5, -80.5)
  point P0 (34.15, -24.5)
  point P1 (8.5, -80.5)
  point P2 (8.5, 0)
  dimension "d224" = 13
extrude "Extrusion67" cut sketch "Sketch81" against normal blind 10 contours L1 L2 L11 L10 L9 L6
extrude "Extrusion68" add sketch "Sketch81" against normal blind 6 contours L6 L5 L3 L7 L2 L1
sketch "Sketch83" plane through (39.35, 0, -25.5) normal (1, 0, 0) x (0, 0, -1)
  line L0 (0, 0) -> (23.523, -43.3366) projected
  line L1 (23.523, -43.3366) -> (23.2095, -52.8715)
  line L2 (23.523, -43.3366) -> (22.9121, -61.9155) projected
  line L3 (23.523, -43.3366) -> (23.2419, -51.887)
  line L4 (23.2419, -51.887) -> (3.2527, -51.2297)
  line L5 (3.2527, -51.2297) -> (3.2527, -61.269)
  line L6 (22.9121, -61.9155) -> (-25.7732, -60.3146) projected
  line L7 (3.2527, -61.269) -> (3.2527, -41.1509)
  line L8 (3.2527, -41.1509) -> (-29.6637, -40.39)
  line L9 (-25.3546, -42.2066) -> (23.523, -43.3366) projected
  line L10 (-29.6637, -40.39) -> (-30.231, -64.9284)
  line L11 (-30.231, -64.9284) -> (3.2527, -61.269)
  point P0 (-25.5, 0)
  point P1 (3.2527, -51.2297)
  dimension "d229" = 20
extrude "Extrusion69" cut sketch "Sketch83" against normal blind 9 contours L7 L5 L11 L10 L8
extrude "Extrusion70" cut sketch "Sketch57" against normal blind 21
sketch "Sketch87" plane through (30.35, 0, -25.5) normal (1, 0, 0) x (0, 0, -1)
  line L0 (0, 0) -> (23.523, -43.3366) projected
  line L1 (23.523, -43.3366) -> (22.3633, -78.6074)
  line L2 (23.523, -43.3366) -> (22.9121, -61.9155) projected
  line L3 (22.3633, -78.6074) -> (29.0342, -79.0987)
  line L4 (29.0342, -79.0987) -> (23.523, -43.3366)
  point P0 (-25.5, 0)
extrude "Extrusion71" cut sketch "Sketch87" against normal blind 6
sketch "Sketch88" plane through (-34.15, -77.85, 24.5) normal (0, -1, 0) x (1, 0, 0)
  point P0 (34.15, -24.5)
fillet "Fillet13" radius 15 1 edges at (24.35, -74.85, -56)
fillet "Fillet14" radius 15 2 edges at (-25.65, -74.85, -56) (-34.15, 3, -25.5)
properties part number "DC23[L][FD1]" material "Aluminio 6061"
